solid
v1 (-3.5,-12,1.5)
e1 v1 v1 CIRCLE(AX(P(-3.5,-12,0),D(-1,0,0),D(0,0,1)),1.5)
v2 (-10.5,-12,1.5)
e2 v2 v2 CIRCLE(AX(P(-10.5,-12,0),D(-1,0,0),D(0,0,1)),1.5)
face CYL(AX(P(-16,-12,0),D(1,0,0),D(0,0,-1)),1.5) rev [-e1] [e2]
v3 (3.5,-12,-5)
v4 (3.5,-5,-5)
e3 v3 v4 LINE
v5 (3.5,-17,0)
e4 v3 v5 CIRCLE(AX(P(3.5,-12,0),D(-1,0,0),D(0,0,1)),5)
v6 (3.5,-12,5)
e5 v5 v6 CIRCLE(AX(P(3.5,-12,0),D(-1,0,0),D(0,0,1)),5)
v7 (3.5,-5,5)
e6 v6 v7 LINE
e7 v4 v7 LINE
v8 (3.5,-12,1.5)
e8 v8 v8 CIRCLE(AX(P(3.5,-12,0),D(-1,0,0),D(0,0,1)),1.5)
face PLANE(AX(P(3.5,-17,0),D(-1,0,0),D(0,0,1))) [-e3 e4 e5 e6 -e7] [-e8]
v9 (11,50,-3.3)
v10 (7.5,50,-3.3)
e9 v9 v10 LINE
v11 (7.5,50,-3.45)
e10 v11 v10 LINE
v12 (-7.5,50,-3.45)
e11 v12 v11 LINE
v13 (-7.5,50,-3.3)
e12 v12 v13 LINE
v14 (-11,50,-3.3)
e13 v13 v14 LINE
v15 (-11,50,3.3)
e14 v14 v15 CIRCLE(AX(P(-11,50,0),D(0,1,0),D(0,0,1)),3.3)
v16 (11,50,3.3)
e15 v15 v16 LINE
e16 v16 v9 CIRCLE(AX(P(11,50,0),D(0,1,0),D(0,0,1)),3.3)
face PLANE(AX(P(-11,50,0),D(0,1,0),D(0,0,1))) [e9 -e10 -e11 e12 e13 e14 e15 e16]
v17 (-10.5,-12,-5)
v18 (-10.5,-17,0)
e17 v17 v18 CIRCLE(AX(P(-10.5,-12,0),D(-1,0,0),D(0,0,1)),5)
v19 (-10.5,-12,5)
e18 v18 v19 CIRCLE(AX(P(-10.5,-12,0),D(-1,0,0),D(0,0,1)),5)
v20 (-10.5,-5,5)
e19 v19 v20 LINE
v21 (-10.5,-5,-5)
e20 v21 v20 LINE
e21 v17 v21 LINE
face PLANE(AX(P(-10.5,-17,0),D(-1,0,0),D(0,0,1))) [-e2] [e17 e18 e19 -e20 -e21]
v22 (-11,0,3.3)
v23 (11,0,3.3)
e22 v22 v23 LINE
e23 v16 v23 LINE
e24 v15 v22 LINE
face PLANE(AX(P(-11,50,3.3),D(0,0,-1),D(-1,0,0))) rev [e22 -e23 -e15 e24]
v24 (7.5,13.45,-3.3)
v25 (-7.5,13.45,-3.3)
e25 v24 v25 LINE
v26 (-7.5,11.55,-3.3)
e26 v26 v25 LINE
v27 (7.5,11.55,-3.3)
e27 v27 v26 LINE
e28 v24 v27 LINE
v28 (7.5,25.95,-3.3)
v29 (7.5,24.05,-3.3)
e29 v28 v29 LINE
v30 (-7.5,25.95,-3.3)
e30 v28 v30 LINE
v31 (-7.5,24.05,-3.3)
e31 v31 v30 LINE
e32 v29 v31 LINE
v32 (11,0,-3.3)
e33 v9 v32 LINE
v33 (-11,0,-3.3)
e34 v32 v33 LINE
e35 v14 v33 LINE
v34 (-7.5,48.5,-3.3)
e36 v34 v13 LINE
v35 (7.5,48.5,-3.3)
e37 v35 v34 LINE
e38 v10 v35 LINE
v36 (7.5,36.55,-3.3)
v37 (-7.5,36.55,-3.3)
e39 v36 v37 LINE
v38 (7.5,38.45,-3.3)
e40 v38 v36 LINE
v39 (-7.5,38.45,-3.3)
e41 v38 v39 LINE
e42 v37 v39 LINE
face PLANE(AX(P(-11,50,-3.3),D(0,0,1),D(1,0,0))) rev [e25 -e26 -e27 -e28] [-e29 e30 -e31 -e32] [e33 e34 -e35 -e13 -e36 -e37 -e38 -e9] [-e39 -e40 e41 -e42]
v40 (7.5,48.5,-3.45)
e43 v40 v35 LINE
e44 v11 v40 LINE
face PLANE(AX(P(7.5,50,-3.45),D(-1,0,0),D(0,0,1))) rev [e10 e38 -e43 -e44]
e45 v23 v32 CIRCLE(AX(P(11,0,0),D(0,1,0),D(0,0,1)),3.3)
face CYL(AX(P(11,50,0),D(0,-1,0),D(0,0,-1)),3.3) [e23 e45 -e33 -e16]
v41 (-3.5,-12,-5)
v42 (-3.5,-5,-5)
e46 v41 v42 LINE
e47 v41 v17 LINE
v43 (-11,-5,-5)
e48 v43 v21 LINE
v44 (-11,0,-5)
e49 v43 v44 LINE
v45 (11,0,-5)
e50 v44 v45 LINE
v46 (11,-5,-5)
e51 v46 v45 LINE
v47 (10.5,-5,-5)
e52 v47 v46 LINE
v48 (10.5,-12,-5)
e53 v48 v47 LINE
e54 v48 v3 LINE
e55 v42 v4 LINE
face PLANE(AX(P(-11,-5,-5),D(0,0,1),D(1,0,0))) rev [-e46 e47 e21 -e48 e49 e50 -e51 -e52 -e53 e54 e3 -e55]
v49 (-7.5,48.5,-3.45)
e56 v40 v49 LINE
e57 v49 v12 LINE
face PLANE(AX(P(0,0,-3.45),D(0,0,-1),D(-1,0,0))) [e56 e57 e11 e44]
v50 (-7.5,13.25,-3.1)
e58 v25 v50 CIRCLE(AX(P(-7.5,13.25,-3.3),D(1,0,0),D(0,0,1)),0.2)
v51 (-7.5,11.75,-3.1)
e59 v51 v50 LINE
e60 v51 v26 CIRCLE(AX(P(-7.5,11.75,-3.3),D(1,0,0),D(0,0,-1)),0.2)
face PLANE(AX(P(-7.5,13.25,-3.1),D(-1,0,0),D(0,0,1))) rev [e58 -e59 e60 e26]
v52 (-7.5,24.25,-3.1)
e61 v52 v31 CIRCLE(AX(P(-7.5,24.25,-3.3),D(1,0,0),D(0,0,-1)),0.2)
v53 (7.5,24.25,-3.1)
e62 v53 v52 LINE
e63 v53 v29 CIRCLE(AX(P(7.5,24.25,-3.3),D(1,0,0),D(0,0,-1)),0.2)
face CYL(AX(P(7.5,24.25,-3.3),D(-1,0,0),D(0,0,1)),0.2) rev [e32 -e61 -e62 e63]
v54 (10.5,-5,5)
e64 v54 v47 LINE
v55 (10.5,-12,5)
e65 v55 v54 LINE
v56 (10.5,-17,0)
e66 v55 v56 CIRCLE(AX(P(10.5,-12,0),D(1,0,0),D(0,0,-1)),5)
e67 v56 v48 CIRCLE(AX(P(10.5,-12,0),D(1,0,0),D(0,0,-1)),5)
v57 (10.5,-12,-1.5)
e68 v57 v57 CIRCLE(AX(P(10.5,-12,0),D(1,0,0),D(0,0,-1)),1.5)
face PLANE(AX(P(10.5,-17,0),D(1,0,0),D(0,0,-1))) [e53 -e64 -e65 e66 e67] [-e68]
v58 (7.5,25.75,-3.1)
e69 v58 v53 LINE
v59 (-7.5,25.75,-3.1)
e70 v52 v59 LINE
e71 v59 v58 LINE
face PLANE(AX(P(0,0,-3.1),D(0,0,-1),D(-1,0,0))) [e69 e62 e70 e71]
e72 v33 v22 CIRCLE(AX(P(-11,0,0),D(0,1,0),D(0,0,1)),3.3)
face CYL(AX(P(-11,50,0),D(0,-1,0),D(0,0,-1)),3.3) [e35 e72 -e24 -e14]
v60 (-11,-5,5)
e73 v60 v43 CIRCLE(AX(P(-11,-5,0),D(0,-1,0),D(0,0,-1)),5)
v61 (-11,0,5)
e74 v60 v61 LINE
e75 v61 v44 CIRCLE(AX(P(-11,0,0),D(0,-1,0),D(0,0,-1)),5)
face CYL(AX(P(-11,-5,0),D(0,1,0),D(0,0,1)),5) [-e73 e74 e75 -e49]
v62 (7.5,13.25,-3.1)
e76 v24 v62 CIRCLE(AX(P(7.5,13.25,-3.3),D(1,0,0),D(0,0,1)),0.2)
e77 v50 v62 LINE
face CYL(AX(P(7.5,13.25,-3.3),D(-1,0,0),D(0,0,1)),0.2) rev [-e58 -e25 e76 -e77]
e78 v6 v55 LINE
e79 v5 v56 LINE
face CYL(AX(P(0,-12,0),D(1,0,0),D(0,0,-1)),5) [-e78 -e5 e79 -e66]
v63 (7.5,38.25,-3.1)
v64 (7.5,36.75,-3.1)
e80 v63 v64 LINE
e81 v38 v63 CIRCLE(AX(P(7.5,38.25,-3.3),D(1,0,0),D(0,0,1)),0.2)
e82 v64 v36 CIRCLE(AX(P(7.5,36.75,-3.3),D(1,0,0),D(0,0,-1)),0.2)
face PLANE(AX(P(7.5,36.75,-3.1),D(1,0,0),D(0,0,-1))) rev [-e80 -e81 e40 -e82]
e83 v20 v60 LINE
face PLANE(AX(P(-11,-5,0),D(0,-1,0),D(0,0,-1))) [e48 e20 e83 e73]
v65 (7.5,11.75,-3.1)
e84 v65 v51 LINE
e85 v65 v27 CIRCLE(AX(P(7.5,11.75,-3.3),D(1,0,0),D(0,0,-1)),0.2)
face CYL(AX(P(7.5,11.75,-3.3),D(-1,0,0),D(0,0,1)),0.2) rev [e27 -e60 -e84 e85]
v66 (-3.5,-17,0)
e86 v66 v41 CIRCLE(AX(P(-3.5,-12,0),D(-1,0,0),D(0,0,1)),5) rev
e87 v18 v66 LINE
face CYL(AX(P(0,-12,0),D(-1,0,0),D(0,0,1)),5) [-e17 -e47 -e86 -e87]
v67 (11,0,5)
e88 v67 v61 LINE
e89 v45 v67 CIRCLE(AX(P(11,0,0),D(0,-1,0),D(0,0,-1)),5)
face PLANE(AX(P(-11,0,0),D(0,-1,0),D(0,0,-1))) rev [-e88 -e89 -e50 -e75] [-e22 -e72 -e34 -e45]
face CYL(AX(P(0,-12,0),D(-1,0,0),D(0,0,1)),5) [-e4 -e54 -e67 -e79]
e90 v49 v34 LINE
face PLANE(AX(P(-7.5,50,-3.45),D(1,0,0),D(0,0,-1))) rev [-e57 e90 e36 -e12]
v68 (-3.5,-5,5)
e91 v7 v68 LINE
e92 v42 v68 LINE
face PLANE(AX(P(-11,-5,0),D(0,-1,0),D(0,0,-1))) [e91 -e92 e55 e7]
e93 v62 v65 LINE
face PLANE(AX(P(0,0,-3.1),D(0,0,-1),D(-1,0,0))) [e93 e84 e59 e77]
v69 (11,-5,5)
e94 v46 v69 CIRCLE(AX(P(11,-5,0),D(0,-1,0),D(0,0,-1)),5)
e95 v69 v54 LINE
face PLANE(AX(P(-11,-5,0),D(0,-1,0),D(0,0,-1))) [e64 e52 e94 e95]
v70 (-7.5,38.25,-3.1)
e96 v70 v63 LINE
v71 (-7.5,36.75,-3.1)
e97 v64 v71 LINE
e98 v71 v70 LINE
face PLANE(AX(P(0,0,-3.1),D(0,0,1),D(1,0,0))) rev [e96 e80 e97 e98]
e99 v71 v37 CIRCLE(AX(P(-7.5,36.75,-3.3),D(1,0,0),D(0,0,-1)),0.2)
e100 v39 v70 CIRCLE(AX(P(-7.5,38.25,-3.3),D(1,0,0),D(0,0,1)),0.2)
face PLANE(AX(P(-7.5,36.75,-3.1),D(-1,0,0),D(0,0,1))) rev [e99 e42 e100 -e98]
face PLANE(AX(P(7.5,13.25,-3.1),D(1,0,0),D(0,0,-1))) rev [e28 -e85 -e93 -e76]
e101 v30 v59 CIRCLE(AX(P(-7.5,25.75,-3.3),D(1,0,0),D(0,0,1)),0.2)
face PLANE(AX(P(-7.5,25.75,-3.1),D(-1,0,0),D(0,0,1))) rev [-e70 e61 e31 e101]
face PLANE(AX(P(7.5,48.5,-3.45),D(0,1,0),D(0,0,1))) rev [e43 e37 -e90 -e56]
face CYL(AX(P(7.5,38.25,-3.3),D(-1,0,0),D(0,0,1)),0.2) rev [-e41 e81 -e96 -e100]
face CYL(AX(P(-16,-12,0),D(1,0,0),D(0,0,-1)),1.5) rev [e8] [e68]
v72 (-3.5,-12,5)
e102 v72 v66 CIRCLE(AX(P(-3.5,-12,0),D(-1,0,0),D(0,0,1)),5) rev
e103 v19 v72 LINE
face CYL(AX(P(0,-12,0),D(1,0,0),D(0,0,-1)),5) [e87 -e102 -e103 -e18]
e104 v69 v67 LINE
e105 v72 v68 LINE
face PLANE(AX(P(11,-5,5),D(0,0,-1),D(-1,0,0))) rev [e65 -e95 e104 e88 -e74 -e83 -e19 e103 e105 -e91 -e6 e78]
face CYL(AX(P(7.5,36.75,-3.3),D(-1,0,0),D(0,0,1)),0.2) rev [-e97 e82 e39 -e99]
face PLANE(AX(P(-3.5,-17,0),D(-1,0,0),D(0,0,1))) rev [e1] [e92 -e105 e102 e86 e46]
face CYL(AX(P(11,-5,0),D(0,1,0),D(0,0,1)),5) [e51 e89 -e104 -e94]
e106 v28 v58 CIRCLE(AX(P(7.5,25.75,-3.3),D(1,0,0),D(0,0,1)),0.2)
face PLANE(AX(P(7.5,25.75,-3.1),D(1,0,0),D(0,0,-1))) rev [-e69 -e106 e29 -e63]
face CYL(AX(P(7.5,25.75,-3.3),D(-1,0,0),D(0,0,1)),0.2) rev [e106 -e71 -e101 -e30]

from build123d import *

# Parameters (mm, degrees)
EXTRUDE_1_DEPTH     = 50
SKETCH_2_W          = 15
SKETCH_2_H          = 1.5
CUT_EXTRUDE_1_DEPTH = 0.2
SKETCH_5_W          = 15
SKETCH_5_H          = 1.5
EXTRUDE_2_DEPTH     = 0.15
EXTRUDE_4_DEPTH     = 5
SKETCH_9_W          = 7
SKETCH_9_H          = 10
EXTRUDE_5_DEPTH     = 12
FILLET_2_R          = 5
SKETCH_10_R         = 1.5
CUT_EXTRUDE_3_DEPTH = 57.808890149
CUT_EXTRUDE_4_DEPTH = 15


with BuildPart() as part:
    # 草图1 → 凸台-拉伸1 (new body)
    with BuildSketch(Plane(origin=(0, 0, 0), x_dir=(1, 0, 0), z_dir=(0, 1, 0))):
        with BuildLine():
            Line((-11, 3.3), (11, 3.3))
            ThreePointArc((11, 3.3), (14.3, 0), (11, -3.3))
            Line((11, -3.3), (-11, -3.3))
            ThreePointArc((-11, -3.3), (-14.3, 0), (-11, 3.3))
        make_face()
    extrude(amount=EXTRUDE_1_DEPTH)

    # 草图2 → 切除-拉伸1 (cut)
    with BuildSketch(Plane(origin=(0, 0, -3.3), x_dir=(-1, 0, 0), z_dir=(0, 0, -1))):
        with Locations((0, 37.5)):
            Rectangle(SKETCH_2_W, SKETCH_2_H)
        with Locations((0, 12.5)):
            Rectangle(SKETCH_2_W, SKETCH_2_H)
        with Locations((0, 25)):
            Rectangle(SKETCH_2_W, SKETCH_2_H)
    extrude(amount=-CUT_EXTRUDE_1_DEPTH, mode=Mode.SUBTRACT)

    # 草图5 → 凸台-拉伸2 (add)
    with BuildSketch(Plane(origin=(0, 0, -3.3), x_dir=(-1, 0, 0), z_dir=(0, 0, -1))):
        with Locations((0, 49.25)):
            Rectangle(SKETCH_5_W, SKETCH_5_H)
    extrude(amount=EXTRUDE_2_DEPTH)

    # 草图8 → 凸台-拉伸4 (add)
    with BuildSketch(Plane.XZ):
        with BuildLine():
            Line((-11, -5), (11, -5))
            ThreePointArc((11, -5), (16, 0), (11, 5))
            Line((11, 5), (-11, 5))
            ThreePointArc((-11, 5), (-16, 0), (-11, -5))
        make_face()
    extrude(amount=EXTRUDE_4_DEPTH)

    # 草图9 → 凸台-拉伸5 (add)
    with BuildSketch(Plane.XZ.offset(5)):
        with Locations((-7, 0)):
            Rectangle(SKETCH_9_W, SKETCH_9_H)
        with Locations((7, 0)):
            Rectangle(SKETCH_9_W, SKETCH_9_H)
    extrude(amount=EXTRUDE_5_DEPTH)

    # 圆角2
    fillet_2_edges = [part.edges().sort_by_distance(p)[0] for p in [
        (7, -17, 5),
        (7, -17, -5),
        (-7, -17, 5),
        (-7, -17, -5),
    ]]
    fillet(fillet_2_edges, radius=FILLET_2_R - 0.0001)  # a hair under: the kernel refuses the full size

    # 草图10 → 切除-拉伸3 (cut, through all)
    with BuildSketch(Plane(origin=(10.5, 0, 0), x_dir=(0, 0, -1), z_dir=(1, 0, 0))):
        with Locations((0, -12)):
            Circle(SKETCH_10_R)
    extrude(amount=-CUT_EXTRUDE_3_DEPTH, mode=Mode.SUBTRACT)

    # 草图11 → 切除-拉伸4 (cut)
    with BuildSketch(Plane(origin=(-7.5, 0, 0), x_dir=(0, 0, -1), z_dir=(1, 0, 0))):
        with BuildLine():
            Line((3.3, 38.45), (3.3, 38.25))
            Line((3.3, 38.25), (3.1, 38.25))
            ThreePointArc((3.1, 38.25), (3.158578644, 38.391421356), (3.3, 38.45))
        make_face()
        with BuildLine():
            Line((3.3, 36.75), (3.3, 36.55))
            ThreePointArc((3.3, 36.55), (3.158578644, 36.608578644), (3.1, 36.75))
            Line((3.1, 36.75), (3.3, 36.75))
        make_face()
        with BuildLine():
            Line((3.3, 25.95), (3.3, 25.75))
            Line((3.3, 25.75), (3.1, 25.75))
            ThreePointArc((3.1, 25.75), (3.158578644, 25.891421356), (3.3, 25.95))
        make_face()
        with BuildLine():
            Line((3.3, 13.45), (3.3, 13.25))
            Line((3.3, 13.25), (3.1, 13.25))
            ThreePointArc((3.1, 13.25), (3.158578644, 13.391421356), (3.3, 13.45))
        make_face()
        with BuildLine():
            Line((3.3, 24.25), (3.3, 24.05))
            ThreePointArc((3.3, 24.05), (3.158578644, 24.108578644), (3.1, 24.25))
            Line((3.1, 24.25), (3.3, 24.25))
        make_face()
        with BuildLine():
            Line((3.3, 11.75), (3.3, 11.55))
            ThreePointArc((3.3, 11.55), (3.158578644, 11.608578644), (3.1, 11.75))
            Line((3.1, 11.75), (3.3, 11.75))
        make_face()
    extrude(amount=CUT_EXTRUDE_4_DEPTH, mode=Mode.SUBTRACT)


solid = part.part
